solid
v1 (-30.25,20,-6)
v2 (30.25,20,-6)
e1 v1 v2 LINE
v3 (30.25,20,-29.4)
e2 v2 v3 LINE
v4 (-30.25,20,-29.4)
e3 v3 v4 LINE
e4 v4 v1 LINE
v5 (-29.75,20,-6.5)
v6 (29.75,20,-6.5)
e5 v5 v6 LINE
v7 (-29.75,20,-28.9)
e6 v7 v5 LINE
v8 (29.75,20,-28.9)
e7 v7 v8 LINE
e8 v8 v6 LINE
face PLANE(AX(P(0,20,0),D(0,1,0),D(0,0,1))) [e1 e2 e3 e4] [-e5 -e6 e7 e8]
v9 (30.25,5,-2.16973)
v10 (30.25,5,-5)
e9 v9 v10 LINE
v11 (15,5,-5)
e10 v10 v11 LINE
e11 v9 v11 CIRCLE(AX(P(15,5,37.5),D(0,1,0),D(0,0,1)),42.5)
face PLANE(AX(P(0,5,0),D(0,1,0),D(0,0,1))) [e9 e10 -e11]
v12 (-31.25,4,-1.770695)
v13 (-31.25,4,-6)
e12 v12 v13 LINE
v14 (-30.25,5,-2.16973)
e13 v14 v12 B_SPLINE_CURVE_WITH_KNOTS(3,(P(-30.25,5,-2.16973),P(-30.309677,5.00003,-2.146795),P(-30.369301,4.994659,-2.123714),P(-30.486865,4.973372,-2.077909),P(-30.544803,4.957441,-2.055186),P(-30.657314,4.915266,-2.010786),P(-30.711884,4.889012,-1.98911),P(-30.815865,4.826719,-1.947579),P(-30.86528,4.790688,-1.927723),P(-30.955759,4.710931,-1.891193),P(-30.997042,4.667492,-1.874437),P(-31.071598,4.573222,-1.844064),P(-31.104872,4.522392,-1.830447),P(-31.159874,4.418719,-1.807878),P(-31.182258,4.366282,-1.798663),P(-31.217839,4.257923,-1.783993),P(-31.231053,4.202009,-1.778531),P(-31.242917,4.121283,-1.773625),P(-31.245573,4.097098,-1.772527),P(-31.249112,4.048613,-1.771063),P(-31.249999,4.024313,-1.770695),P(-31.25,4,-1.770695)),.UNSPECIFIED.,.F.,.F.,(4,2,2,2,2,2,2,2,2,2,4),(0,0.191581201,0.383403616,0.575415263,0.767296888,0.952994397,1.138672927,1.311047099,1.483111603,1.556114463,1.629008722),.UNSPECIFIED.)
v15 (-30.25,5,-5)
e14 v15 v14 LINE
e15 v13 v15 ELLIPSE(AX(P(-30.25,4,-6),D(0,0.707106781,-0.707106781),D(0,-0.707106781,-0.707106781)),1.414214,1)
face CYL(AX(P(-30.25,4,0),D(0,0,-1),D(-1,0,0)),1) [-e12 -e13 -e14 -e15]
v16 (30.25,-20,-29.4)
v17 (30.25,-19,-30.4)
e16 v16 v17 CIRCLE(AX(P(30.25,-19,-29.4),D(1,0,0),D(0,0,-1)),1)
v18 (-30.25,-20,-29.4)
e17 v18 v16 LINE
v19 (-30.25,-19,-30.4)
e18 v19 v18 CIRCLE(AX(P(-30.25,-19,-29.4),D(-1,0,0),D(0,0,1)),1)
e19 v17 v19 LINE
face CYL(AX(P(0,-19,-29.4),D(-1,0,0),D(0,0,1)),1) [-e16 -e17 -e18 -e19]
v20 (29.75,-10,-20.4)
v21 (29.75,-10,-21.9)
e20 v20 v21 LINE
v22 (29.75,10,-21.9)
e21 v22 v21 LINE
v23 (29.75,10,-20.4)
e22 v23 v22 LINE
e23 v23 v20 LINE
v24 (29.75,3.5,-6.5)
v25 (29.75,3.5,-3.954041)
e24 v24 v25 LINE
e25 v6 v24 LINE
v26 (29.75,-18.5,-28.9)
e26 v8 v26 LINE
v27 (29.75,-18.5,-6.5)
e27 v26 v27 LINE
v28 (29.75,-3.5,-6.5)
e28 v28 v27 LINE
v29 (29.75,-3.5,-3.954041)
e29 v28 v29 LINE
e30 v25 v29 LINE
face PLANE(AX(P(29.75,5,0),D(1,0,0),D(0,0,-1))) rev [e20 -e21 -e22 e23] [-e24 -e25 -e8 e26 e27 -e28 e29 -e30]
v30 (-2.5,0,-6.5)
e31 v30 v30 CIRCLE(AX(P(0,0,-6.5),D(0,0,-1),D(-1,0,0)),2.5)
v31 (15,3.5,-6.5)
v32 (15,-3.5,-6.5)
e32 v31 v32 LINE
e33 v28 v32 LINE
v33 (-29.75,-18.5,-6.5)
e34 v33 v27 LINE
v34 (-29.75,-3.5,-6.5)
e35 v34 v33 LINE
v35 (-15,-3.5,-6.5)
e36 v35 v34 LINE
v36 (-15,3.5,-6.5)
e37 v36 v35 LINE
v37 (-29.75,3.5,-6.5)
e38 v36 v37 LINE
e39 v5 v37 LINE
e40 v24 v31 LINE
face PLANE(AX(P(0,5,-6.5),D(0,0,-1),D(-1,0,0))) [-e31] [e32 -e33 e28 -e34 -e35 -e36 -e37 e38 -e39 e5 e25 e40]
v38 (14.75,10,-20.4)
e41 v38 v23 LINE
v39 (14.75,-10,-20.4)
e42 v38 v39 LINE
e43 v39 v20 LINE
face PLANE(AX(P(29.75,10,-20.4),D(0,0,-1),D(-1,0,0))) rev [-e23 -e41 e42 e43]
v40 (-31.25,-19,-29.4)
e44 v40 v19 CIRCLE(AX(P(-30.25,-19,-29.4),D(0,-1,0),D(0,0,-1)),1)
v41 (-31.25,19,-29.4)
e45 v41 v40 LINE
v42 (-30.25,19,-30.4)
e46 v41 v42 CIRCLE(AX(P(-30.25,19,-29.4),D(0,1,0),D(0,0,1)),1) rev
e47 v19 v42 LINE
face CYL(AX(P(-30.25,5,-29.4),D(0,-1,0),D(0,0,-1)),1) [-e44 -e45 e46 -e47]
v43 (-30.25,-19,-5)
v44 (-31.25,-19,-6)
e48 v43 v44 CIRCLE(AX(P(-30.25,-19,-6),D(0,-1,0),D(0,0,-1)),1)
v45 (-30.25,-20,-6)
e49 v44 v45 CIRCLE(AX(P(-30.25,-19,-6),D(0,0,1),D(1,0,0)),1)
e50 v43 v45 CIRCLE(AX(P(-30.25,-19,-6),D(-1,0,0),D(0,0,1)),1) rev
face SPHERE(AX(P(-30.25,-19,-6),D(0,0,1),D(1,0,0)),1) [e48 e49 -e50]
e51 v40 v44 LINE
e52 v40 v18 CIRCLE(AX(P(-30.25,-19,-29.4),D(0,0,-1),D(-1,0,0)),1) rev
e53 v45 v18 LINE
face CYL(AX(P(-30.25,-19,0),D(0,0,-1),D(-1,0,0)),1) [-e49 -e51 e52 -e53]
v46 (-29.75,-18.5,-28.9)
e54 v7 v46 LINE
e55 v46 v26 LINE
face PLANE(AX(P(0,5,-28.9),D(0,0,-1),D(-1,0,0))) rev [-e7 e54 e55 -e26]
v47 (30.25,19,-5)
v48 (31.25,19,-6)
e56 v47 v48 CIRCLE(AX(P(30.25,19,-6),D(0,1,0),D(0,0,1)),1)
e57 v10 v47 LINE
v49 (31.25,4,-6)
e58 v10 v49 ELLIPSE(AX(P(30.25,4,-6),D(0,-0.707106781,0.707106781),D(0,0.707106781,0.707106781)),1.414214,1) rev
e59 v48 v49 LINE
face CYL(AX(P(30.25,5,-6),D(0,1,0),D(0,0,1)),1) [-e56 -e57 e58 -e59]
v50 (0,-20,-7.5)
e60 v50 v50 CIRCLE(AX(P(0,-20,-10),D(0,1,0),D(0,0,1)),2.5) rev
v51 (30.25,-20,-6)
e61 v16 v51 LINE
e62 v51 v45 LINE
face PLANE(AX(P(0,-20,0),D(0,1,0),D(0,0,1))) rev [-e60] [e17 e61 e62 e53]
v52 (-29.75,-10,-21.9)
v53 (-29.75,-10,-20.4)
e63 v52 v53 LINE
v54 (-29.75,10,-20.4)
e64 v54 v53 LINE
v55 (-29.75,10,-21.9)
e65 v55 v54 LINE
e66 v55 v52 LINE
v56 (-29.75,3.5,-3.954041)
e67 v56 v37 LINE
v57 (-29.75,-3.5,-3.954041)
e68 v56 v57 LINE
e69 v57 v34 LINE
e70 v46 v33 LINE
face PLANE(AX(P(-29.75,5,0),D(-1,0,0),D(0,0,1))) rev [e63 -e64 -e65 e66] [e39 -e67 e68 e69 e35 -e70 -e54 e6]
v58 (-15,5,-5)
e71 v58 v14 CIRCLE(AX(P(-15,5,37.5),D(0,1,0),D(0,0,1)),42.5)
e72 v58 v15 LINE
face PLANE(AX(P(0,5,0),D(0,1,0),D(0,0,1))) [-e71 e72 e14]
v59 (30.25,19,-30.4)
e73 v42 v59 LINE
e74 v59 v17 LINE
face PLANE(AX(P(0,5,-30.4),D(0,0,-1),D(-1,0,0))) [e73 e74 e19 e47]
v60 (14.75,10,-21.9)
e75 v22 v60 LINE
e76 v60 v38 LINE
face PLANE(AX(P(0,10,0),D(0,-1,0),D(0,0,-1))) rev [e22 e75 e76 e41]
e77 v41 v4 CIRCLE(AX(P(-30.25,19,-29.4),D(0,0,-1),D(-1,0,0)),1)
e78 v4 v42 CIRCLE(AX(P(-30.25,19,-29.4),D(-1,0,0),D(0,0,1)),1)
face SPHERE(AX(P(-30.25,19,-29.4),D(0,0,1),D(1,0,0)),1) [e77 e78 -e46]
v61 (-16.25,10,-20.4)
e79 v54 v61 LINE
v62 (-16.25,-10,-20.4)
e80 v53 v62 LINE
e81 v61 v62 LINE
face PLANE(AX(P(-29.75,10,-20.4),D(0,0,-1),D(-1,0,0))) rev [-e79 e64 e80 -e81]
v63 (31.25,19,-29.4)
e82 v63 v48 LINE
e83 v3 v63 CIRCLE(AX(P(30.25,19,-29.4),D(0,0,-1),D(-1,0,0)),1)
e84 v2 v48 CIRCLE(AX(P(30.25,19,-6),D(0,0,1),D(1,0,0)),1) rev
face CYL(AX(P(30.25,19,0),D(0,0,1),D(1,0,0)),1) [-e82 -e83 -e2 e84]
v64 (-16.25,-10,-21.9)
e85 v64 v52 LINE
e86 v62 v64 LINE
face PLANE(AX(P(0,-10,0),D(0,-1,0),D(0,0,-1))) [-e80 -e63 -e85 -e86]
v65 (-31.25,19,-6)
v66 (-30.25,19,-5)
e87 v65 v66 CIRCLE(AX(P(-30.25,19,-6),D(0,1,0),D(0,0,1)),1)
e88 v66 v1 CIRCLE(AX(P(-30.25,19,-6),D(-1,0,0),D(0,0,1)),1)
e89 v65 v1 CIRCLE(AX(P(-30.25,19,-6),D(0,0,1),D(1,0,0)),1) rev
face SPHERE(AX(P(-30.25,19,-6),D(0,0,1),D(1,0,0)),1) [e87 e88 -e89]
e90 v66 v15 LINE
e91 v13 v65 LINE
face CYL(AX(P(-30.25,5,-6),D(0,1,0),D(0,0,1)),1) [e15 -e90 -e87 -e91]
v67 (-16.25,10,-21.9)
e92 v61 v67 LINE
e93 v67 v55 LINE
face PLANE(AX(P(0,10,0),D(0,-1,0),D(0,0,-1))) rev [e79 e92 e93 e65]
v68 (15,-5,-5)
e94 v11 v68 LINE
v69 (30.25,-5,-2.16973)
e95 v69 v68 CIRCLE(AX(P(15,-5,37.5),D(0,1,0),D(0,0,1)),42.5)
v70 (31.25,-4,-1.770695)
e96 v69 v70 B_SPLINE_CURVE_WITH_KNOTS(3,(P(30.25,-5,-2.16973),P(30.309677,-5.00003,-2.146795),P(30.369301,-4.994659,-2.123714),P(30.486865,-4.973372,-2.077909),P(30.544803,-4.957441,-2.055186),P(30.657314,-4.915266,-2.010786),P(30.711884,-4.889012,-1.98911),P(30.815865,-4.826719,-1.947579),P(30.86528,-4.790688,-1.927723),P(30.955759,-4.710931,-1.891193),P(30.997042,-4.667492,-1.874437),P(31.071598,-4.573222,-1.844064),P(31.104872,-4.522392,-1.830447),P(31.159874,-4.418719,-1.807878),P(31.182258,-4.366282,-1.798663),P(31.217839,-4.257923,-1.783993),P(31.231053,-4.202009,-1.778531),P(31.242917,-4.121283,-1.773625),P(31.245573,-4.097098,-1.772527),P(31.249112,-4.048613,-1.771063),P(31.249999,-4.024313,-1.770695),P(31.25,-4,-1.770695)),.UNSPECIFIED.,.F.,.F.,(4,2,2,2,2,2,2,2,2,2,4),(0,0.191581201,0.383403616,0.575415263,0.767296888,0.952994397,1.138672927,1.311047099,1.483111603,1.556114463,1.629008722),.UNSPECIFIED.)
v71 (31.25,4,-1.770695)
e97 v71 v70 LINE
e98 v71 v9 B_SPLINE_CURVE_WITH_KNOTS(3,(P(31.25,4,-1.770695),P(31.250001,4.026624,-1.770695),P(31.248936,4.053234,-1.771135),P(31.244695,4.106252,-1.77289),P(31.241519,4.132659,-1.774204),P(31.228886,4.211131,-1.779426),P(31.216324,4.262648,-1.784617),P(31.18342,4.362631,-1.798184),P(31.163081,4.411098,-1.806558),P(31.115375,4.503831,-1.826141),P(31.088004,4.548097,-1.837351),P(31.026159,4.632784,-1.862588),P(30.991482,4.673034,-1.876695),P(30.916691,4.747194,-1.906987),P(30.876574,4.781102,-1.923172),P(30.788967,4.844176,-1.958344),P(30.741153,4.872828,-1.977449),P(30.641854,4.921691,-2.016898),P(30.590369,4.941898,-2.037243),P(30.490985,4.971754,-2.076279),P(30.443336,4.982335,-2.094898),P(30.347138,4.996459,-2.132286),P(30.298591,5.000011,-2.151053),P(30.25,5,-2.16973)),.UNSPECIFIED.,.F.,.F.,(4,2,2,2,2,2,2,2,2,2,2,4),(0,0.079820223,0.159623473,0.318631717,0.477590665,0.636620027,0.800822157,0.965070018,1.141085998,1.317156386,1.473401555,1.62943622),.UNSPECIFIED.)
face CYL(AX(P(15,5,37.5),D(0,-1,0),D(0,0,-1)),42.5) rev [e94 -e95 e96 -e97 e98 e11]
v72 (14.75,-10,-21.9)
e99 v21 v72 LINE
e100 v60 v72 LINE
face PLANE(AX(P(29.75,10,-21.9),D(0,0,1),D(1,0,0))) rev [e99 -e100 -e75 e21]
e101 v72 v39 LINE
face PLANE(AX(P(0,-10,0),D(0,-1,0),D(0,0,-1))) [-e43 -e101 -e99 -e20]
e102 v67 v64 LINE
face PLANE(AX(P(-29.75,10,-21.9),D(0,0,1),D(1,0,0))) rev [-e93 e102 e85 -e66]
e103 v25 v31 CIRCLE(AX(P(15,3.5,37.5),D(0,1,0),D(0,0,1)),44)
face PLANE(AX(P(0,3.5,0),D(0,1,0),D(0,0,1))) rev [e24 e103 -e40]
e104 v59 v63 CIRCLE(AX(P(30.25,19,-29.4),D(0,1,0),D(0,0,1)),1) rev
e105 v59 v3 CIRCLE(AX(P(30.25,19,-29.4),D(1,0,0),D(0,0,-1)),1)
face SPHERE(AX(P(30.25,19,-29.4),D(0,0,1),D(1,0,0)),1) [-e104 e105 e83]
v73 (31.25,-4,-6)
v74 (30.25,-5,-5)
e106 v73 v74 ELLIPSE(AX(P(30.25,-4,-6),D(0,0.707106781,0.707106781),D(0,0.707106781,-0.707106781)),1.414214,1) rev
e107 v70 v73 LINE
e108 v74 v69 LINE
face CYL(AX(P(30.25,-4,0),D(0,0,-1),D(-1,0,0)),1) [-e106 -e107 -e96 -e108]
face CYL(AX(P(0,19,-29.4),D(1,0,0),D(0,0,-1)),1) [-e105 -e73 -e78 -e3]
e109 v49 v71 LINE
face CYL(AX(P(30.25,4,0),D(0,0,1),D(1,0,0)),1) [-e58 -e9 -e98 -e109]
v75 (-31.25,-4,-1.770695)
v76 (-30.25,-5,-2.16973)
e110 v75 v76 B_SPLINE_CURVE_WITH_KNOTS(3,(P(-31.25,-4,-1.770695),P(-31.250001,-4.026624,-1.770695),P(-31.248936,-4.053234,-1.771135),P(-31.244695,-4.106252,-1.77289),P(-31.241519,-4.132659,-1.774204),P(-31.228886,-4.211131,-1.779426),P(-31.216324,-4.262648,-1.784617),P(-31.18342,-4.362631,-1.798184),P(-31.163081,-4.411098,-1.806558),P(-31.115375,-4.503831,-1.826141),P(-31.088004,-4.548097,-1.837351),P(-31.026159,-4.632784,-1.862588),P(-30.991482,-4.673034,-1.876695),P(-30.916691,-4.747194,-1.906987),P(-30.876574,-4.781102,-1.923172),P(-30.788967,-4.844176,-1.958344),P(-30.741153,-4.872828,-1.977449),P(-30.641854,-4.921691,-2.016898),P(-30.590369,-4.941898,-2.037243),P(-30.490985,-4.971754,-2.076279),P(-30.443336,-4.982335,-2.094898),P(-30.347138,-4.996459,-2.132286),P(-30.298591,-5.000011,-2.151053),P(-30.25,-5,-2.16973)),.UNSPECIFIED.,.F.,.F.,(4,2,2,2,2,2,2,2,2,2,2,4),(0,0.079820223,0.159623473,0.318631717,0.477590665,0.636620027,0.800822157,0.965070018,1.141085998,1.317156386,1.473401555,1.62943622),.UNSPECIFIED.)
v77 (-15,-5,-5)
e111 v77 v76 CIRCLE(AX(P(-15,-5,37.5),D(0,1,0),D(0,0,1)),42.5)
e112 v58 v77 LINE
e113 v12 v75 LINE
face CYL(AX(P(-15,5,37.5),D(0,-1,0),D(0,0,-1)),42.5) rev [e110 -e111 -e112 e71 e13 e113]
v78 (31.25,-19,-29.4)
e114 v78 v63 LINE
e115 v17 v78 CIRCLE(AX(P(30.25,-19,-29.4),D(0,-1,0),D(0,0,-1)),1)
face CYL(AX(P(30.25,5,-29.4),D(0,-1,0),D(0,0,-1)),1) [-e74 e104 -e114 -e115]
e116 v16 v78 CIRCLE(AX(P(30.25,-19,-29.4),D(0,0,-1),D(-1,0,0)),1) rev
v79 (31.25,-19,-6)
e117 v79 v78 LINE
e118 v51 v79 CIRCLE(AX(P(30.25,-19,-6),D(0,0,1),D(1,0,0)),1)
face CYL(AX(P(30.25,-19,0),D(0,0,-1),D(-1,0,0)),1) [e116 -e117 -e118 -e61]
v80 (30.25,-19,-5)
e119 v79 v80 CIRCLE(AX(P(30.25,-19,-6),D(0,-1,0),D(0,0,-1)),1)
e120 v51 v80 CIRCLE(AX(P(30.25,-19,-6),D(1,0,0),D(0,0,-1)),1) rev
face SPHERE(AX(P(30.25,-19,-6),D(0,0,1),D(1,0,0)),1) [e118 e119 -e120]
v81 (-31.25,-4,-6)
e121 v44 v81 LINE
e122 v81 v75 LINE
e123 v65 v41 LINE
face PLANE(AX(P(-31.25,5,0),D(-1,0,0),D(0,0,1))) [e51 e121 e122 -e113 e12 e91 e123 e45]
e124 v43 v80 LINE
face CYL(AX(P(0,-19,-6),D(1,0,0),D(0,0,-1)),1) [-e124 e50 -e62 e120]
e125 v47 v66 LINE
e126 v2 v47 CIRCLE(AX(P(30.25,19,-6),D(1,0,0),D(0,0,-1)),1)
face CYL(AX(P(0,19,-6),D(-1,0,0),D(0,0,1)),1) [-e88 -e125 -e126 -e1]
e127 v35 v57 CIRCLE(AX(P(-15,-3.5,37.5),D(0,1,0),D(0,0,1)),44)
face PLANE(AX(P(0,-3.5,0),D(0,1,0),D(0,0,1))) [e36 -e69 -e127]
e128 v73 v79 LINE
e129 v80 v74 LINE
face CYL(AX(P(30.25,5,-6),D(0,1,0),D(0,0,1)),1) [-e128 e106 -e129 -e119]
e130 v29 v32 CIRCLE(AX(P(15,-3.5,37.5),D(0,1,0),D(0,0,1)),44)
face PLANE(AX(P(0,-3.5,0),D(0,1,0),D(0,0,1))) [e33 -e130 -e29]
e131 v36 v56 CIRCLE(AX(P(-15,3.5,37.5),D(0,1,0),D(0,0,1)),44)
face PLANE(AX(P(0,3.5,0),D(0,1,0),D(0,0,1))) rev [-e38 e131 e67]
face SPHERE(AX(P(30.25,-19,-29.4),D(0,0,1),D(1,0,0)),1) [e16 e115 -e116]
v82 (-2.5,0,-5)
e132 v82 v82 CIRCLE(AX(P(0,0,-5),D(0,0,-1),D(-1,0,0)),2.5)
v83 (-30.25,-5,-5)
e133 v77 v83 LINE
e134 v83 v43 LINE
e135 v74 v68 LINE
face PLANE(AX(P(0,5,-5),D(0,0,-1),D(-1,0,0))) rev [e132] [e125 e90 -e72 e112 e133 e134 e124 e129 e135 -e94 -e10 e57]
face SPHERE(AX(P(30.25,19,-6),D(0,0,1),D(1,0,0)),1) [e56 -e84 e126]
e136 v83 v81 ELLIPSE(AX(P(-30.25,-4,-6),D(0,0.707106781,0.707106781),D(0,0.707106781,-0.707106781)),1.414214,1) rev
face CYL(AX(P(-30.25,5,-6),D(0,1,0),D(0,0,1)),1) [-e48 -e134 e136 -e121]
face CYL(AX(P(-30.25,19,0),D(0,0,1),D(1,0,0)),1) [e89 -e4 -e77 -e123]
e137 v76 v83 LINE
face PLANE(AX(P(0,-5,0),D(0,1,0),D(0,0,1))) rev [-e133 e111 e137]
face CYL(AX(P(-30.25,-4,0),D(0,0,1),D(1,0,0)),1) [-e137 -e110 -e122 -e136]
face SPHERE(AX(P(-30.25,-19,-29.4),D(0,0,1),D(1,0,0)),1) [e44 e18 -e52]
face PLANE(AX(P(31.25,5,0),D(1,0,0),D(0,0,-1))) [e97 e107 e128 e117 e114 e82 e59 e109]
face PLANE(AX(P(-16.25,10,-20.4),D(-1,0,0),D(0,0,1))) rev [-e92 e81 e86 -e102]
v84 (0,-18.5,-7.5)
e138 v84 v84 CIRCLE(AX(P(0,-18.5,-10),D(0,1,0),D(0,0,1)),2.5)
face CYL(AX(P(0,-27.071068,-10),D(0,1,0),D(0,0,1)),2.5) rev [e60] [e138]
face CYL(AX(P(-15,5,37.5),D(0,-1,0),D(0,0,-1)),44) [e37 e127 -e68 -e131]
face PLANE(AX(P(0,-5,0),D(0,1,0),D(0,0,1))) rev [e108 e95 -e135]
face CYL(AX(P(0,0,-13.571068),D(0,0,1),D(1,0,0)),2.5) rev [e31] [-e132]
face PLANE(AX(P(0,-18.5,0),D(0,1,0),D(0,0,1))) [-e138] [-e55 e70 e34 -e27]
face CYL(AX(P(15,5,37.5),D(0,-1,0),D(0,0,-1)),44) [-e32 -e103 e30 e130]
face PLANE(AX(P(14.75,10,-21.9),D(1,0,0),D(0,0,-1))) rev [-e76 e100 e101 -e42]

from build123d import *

# Parameters (mm, degrees)
BOSS_EXTRUDE1_DEPTH = 5
BOSS_EXTRUDE2_DEPTH = 20
SHELL1_START        = -18.5
SHELL1_OUTLINE_W    = 59.5
SHELL1_OUTLINE_H    = 22.4
SHELL1_DEPTH        = 38.5
SHELL1_START_2      = -3.5
SHELL1_2_DEPTH      = 7
SKETCH14_R          = 2.5
CUT_EXTRUDE1_DEPTH  = 1.5
SKETCH15_W          = 13.5
SKETCH15_H          = 1.5
SKETCH15_W_2        = 15
BOSS_EXTRUDE3_DEPTH = 10
FILLET21_R          = 1
CUT_EXTRUDE2_START  = -18.5
SKETCH16_R          = 2.5
CUT_EXTRUDE2_DEPTH  = 1.5


# Read off the part's stored shape, not the designer's step: Shell1
with BuildPart() as part:
    # Sketch13 → Boss-Extrude1 (new, symmetric)
    with BuildSketch(Plane(origin=(0, 0, 0), x_dir=(1, 0, 0), z_dir=(0, 1, 0))):
        with BuildLine():
            ThreePointArc((-31.25, 1.770695181), (-23.283883594, 4.184856634), (-15, 5))
            Line((-15, 5), (-31.25, 5))
            Line((-31.25, 5), (-31.25, 1.770695181))
        make_face()
        Polygon((-15, 5), (15, 5), (31.25, 5), (31.25, 30.4), (-31.25, 30.4), (-31.25, 5), align=None)
        with BuildLine():
            Line((31.25, 5), (15, 5))
            ThreePointArc((15, 5), (23.283883594, 4.184856634), (31.25, 1.770695181))
            Line((31.25, 1.770695181), (31.25, 5))
        make_face()
    extrude(amount=BOSS_EXTRUDE1_DEPTH, both=True)

    # Sketch13<12> → Boss-Extrude2 (add, symmetric)
    with BuildSketch(Plane(origin=(0, 0, 0), x_dir=(1, 0, 0), z_dir=(0, 1, 0))):
        Polygon((-15, 5), (15, 5), (31.25, 5), (31.25, 30.4), (-31.25, 30.4), (-31.25, 5), align=None)
    extrude(amount=BOSS_EXTRUDE2_DEPTH, both=True)

    # Shell1 outline → Shell1 (cut)
    with BuildSketch(Plane(origin=(0, 0, 0), x_dir=(1, 0, 0), z_dir=(0, 1, 0)).offset(SHELL1_START)):
        with Locations((0, 17.7)):
            Rectangle(SHELL1_OUTLINE_W, SHELL1_OUTLINE_H)
    extrude(amount=SHELL1_DEPTH, mode=Mode.SUBTRACT)

    # Shell1 2 outline → Shell1 2 (cut)
    with BuildSketch(Plane(origin=(0, 0, 0), x_dir=(1, 0, 0), z_dir=(0, 1, 0)).offset(SHELL1_START_2)):
        with BuildLine():
            Line((-29.75, 6.5), (-29.75, 3.954040816))
            ThreePointArc((-29.75, 3.954040816), (-22.484056523, 5.858838752), (-15, 6.5))
            Line((-15, 6.5), (-29.75, 6.5))
        make_face()
        with BuildLine():
            Line((29.75, 6.5), (15, 6.5))
            ThreePointArc((15, 6.5), (22.484056523, 5.858838752), (29.75, 3.954040816))
            Line((29.75, 3.954040816), (29.75, 6.5))
        make_face()
    extrude(amount=SHELL1_2_DEPTH, mode=Mode.SUBTRACT)

    # Sketch14 → Cut-Extrude1 (cut)
    with BuildSketch(Plane.XY.offset(-5)):
        with Locations(Location((0, 0, 0), (0, 0, 180))):
            Circle(SKETCH14_R)
    extrude(amount=-CUT_EXTRUDE1_DEPTH, mode=Mode.SUBTRACT)

    # Sketch15 → Boss-Extrude3 (add, symmetric)
    with BuildSketch(Plane(origin=(0, 0, 0), x_dir=(1, 0, 0), z_dir=(0, 1, 0))):
        with Locations((-23, 21.15)):
            Rectangle(SKETCH15_W, SKETCH15_H)
        with Locations((22.25, 21.15)):
            Rectangle(SKETCH15_W_2, SKETCH15_H)
    extrude(amount=BOSS_EXTRUDE3_DEPTH, both=True)

    # Fillet21
    fillet21_edges = [part.edges().sort_by_distance(p)[0] for p in [
        (-31.25, 0, -30.4),
        (31.25, 0, -30.4),
        (31.25, -5, -3.385347591),
        (31.25, 5, -3.385347591),
        (31.25, -12.5, -5),
        (-31.25, -20, -17.7),
        (-31.25, -12.5, -5),
        (0, -20, -5),
        (31.25, 12.5, -5),
        (31.25, 20, -17.7),
        (0, 20, -30.4),
        (-31.25, 12.5, -5),
        (-31.25, 20, -17.7),
        (0, 20, -5),
        (31.25, -20, -17.7),
        (0, -20, -30.4),
        (-31.25, 5, -3.385347591),
        (-31.25, -5, -3.385347591),
    ]]
    fillet(fillet21_edges, radius=FILLET21_R)

    # Sketch16 → Cut-Extrude2 (cut)
    with BuildSketch(Plane(origin=(0, 0, 0), x_dir=(1, 0, 0), z_dir=(0, 1, 0)).offset(CUT_EXTRUDE2_START)):
        with Locations(Location((0, 10, 0), (0, 0, 270))):
            Circle(SKETCH16_R)
    extrude(amount=-CUT_EXTRUDE2_DEPTH, mode=Mode.SUBTRACT)


solid = part.part
